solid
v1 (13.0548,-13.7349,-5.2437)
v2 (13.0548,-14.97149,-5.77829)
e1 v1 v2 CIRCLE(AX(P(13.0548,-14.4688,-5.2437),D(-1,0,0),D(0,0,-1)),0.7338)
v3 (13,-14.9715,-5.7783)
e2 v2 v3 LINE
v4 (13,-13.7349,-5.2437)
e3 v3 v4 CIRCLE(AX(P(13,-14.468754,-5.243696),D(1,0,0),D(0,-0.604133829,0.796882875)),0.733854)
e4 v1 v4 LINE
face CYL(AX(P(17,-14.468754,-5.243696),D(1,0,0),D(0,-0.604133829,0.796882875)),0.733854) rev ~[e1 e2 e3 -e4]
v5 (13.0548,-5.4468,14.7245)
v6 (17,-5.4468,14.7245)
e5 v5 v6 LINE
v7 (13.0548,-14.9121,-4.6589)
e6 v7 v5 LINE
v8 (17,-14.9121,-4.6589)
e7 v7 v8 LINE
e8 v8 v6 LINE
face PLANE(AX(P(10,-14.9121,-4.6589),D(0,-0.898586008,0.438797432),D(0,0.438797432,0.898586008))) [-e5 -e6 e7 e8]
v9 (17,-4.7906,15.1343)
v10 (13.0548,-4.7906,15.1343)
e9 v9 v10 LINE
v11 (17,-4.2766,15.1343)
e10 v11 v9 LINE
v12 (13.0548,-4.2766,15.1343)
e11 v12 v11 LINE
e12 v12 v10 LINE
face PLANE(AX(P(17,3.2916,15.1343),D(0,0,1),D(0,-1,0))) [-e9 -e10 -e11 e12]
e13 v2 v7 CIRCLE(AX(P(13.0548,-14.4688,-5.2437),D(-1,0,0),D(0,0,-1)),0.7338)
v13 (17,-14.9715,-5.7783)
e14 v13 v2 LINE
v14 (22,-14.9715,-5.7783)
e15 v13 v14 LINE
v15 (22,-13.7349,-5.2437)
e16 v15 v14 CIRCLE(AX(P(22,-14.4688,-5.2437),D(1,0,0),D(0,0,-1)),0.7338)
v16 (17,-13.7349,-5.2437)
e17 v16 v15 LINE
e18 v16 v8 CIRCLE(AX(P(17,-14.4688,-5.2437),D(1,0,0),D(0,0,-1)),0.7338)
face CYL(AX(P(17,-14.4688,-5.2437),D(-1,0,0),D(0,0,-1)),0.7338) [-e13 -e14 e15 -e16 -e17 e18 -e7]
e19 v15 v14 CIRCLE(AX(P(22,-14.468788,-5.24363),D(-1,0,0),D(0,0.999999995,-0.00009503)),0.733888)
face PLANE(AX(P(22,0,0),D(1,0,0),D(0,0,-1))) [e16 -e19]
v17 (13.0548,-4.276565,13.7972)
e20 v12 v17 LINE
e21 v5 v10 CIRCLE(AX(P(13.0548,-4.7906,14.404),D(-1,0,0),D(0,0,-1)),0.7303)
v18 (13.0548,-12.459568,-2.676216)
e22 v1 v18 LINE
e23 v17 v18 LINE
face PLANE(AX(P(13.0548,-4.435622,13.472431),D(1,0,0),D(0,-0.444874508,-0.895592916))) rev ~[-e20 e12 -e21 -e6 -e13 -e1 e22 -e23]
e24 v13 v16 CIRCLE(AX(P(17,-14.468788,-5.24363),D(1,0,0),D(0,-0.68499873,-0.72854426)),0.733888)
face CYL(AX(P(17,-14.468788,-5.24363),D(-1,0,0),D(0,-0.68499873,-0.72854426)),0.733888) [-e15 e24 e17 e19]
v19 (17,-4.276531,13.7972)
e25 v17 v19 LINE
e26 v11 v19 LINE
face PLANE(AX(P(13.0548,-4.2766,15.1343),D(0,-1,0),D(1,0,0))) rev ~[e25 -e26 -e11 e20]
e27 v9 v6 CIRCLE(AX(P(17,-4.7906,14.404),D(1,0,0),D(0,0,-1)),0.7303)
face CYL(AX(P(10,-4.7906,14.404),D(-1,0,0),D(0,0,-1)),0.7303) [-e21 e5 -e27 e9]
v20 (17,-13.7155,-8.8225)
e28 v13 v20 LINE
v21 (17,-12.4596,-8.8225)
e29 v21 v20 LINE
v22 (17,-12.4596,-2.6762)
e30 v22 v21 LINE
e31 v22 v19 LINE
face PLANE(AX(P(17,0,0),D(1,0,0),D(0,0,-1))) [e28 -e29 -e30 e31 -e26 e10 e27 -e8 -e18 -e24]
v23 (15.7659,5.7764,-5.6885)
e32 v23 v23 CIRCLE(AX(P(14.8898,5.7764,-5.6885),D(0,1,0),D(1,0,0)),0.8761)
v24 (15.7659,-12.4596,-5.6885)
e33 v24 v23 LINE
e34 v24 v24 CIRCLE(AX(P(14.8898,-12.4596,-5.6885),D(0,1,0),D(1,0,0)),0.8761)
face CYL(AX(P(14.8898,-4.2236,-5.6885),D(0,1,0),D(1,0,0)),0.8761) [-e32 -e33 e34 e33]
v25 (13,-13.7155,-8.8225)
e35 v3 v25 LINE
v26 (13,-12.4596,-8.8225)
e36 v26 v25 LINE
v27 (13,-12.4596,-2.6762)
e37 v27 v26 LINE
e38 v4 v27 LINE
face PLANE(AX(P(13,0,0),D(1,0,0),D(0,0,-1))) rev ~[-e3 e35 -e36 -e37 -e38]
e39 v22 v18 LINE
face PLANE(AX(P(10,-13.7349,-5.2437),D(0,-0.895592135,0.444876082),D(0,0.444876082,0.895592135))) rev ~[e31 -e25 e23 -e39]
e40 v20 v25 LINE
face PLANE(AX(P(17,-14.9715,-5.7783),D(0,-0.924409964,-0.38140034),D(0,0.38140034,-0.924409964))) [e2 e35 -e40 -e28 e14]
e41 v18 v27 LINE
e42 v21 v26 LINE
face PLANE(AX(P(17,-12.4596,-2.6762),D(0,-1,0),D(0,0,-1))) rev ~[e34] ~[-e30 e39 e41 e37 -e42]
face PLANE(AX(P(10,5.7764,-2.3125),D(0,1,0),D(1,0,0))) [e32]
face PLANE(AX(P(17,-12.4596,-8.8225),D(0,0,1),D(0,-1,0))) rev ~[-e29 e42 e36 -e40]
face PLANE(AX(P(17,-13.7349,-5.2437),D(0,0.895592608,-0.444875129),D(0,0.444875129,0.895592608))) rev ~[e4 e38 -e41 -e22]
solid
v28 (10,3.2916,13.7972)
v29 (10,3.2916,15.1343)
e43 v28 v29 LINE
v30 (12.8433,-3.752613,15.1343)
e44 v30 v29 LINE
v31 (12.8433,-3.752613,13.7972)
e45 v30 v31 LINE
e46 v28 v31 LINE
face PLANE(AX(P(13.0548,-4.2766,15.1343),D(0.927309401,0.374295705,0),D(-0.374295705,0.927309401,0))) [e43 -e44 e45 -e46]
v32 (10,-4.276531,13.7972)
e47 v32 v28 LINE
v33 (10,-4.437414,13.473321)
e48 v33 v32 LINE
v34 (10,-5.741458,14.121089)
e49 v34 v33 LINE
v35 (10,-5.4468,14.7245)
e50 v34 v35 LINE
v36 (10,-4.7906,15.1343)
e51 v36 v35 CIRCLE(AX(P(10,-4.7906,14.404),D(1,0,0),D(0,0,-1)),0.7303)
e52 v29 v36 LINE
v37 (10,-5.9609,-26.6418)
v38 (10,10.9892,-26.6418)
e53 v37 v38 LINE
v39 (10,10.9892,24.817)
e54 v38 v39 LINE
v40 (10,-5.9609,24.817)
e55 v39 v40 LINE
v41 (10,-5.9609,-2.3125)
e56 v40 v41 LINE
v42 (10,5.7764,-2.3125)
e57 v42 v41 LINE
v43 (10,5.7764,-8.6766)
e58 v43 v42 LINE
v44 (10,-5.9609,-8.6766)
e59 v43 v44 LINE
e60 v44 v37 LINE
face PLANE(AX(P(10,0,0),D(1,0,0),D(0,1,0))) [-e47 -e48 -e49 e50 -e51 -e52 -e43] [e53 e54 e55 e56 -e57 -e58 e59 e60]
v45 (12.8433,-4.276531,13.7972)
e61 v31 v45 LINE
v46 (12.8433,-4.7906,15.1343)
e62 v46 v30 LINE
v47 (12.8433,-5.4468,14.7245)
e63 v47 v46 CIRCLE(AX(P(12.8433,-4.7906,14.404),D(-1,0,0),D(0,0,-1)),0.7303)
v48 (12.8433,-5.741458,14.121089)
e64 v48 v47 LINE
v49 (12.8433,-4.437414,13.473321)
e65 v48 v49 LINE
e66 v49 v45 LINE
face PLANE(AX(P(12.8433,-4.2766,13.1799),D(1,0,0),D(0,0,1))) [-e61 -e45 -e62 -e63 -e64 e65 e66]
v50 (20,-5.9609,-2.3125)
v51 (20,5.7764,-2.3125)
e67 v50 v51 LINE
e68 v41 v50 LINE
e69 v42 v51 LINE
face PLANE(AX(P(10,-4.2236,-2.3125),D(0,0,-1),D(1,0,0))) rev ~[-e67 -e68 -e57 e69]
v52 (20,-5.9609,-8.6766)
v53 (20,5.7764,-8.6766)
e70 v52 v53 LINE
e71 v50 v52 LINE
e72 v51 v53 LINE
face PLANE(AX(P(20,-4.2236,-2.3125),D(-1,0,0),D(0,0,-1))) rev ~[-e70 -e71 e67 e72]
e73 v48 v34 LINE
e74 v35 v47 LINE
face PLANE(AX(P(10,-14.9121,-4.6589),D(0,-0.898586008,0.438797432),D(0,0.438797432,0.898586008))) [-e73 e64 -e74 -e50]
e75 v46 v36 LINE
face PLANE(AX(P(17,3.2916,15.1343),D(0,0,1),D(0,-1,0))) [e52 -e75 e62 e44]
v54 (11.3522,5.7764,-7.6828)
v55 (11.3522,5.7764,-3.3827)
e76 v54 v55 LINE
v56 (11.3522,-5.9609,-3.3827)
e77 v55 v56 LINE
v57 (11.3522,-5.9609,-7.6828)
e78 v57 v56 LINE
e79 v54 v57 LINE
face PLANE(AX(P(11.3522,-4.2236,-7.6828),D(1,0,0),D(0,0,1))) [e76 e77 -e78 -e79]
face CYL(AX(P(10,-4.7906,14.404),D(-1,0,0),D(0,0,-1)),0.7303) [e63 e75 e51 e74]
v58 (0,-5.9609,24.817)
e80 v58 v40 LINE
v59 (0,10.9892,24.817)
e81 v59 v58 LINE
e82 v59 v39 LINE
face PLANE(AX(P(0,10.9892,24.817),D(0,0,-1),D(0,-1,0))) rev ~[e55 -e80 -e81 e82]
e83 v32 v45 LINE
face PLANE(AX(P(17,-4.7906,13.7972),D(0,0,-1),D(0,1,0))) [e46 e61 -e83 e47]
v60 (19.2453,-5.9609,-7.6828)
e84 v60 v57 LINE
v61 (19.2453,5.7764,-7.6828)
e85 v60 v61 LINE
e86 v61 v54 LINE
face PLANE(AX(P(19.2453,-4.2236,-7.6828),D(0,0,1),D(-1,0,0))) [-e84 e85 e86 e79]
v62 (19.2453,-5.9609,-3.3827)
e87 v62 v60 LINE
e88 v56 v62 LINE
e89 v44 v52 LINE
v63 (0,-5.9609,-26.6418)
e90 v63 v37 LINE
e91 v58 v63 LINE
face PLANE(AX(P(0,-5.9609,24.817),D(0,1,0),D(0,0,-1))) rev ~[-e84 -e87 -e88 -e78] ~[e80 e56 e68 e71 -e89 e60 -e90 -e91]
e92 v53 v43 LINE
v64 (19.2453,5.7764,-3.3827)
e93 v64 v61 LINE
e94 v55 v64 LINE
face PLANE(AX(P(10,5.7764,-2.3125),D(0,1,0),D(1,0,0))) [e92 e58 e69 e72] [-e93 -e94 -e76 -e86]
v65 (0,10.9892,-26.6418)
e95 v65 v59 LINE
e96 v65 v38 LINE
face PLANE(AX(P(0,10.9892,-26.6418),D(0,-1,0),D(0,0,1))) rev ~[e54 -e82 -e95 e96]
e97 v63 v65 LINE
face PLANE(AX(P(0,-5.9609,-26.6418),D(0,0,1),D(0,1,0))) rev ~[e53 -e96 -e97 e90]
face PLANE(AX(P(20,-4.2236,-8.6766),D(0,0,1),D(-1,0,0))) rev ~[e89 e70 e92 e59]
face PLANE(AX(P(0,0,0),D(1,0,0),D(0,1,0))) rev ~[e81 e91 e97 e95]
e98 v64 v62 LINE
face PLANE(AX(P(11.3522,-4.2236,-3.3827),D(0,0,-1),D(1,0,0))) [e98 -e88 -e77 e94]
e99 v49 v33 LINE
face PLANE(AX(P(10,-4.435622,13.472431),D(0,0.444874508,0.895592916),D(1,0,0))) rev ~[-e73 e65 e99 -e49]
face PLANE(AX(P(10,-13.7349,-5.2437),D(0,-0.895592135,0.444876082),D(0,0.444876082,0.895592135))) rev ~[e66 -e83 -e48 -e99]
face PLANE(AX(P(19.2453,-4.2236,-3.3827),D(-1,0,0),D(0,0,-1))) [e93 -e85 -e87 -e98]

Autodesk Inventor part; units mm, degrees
ref_plane "YZ Plane" through (0, 0, 0) normal (1, 0, 0) x (0, 1, 0)
ref_plane "XZ Plane" through (0, 0, 0) normal (0, 1, 0) x (-1, 0, 0)
ref_plane "XY Plane" through (0, 0, 0) normal (0, 0, 1) x (1, 0, 0)
sketch "Эскиз1" plane through (0, 0, 0) normal (1, 0, 0) x (0, 1, 0)
  line L0 (10.9892, 24.817) -> (-5.9609, 24.817)
  line L1 (-5.9609, 24.817) -> (-5.9609, -26.6418)
  line L2 (-5.9609, -26.6418) -> (10.9892, -26.6418)
  line L3 (10.9892, -26.6418) -> (10.9892, 24.817)
  point P0 (0, 0)
extrude "Выдавливание1" add sketch "Эскиз1" along normal blind 10
sketch "Эскиз2" plane through (10, 0, 0) normal (1, 0, 0) x (0, 0, -1)
  line L0 (-24.817, -5.9609) -> (26.6418, -5.9609) projected
  line L1 (8.6766, -5.9609) -> (2.3125, -5.9609)
  line L2 (2.3125, -5.9609) -> (2.3125, -4.2236)
  line L3 (2.3125, -4.2236) -> (8.6766, -4.2236)
  line L4 (8.6766, -4.2236) -> (8.6766, -5.9609)
  point P0 (0, 0)
extrude "Выдавливание2" add sketch "Эскиз2" along normal blind 10
sketch "Эскиз3" plane through (10, -4.2236, -2.3125) normal (0, 1, 0) x (1, 0, 0)
  line L0 (9.2453, 5.3703) -> (1.3522, 5.3703)
  line L1 (1.3522, 5.3703) -> (1.3522, 1.0702)
  line L2 (1.3522, 1.0702) -> (9.2453, 1.0702)
  line L3 (9.2453, 1.0702) -> (9.2453, 5.3703)
  point P0 (-10, -2.3125)
extrude "Выдавливание3" cut sketch "Эскиз3" against normal blind 10
sketch "Эскиз4" plane through (10, 0, 0) normal (1, 0, 0) x (0, 0, -1)
  circle A0 centre (-14.404, -4.7906) radius 0.7303
  circle A1 centre (5.2437, -14.4688) radius 0.7338
  line L0 (5.2437, -13.7349) -> (-14.0791, -4.1365)
  line L1 (4.6589, -14.9121) -> (-14.7245, -5.4468)
  point P0 (0, 0)
extrude "Выдавливание4" add sketch "Эскиз4" along normal blind 7
sketch "Эскиз5" plane through (10, -4.1365, 14.0791) normal (0, 0.8955929, -0.4448745) x (1, 0, 0)
  line L0 (0, 29.7403) -> (0, -16.3458) projected
  line L1 (0, 0.6764) -> (3.0548, 0.6764)
  line L2 (3.0548, 0.6764) -> (3.0548, 24.6626)
  line L3 (3.0548, 24.6626) -> (0, 24.6626)
  line L4 (0, 24.6626) -> (0, 0.6764)
  point P0 (-10, 10.7689)
  point P1 (0, 24.6626)
extrude "Выдавливание5" cut sketch "Эскиз5" against normal mid plane 10
sketch "Эскиз6" plane through (10, -4.2236, -2.3125) normal (0, 1, 0) x (1, 0, 0)
  circle A0 centre (4.8898, 3.376) radius 0.8761
  point P0 (-10, -2.3125)
extrude "Выдавливание6" add sketch "Эскиз6" along normal mid plane 20
sketch "Эскиз7" plane through (17, 0, 0) normal (1, 0, 0) x (0, 0, -1)
  point P0 (0, 0)
sketch "Эскиз8" plane through (10, -4.2236, -2.3125) normal (0, 1, 0) x (1, 0, 0)
  line L0 (10, 0) -> (10, 6.3641) projected
  line L1 (10, 6.3641) -> (0, 6.3641)
  line L2 (0, 6.3641) -> (0, 0)
  line L3 (0, 0) -> (10, 0)
  line L4 (10, 0) -> (10, 6.3641)
  line L5 (9.2453, 5.3703) -> (1.3522, 5.3703) projected
  line L6 (1.3522, 5.3703) -> (1.3522, 1.0702) projected
  line L7 (9.2453, 5.3703) -> (1.3522, 5.3703)
  line L8 (1.3522, 5.3703) -> (1.3522, 1.0702)
  line L9 (1.3522, 1.0702) -> (9.2453, 1.0702)
  line L10 (9.2453, 1.0702) -> (9.2453, 5.3703)
  point P0 (-10, -2.3125)
extrude "Выдавливание7" add sketch "Эскиз8" along normal blind 10
sketch "Эскиз11" plane through (17, 0, 0) normal (1, 0, 0) x (0, 0, -1)
  arc A0 (-14.0791, -4.1365) -> (-14.7245, -5.4468) centre (-14.404, -4.7906) ccw projected
  line L0 (-15.1343, -4.7906) -> (-13.7972, -4.7906)
  line L1 (-13.7972, -4.7906) -> (-13.7972, 3.2916)
  line L2 (-13.7972, 3.2916) -> (-15.1343, 3.2916)
  line L3 (-15.1343, 3.2916) -> (-15.1343, -4.7906)
  point P0 (0, 0)
extrude "Выдавливание8" add sketch "Эскиз11" against normal blind 10
sketch "Эскиз12" plane through (17, -4.7906, 15.1343) normal (0, 0, 1) x (1, 0, 0)
  line L0 (-7, 0.514) -> (0, 0.514) projected
  line L1 (0, 0.514) -> (-3.9452, 0.514)
  line L2 (-7, 8.0822) -> (-7, 0.514) projected
  line L3 (-3.9452, 0.514) -> (-7, 8.0822)
  line L4 (-7, 8.0822) -> (0, 8.0822)
  line L5 (-3.9452, 0.3531) -> (-7, 0.3531) projected
  line L6 (0, 0.514) -> (0, 8.0822) projected
  line L7 (0, 8.0822) -> (0, 0.514)
  line L8 (0, 0.514) -> (-3.9452, 0.514)
  point P0 (-17, 4.7906)
extrude "Выдавливание9" cut sketch "Эскиз12" against normal blind 10 contours L3 L4 L6 L0
sketch "Эскиз13" plane through (17, 0, 0) normal (1, 0, 0) x (0, 0, -1)
  line L0 (5.2437, -13.7349) -> (-13.4734, -4.4374) projected
  line L1 (2.6762, -12.4596) -> (8.8225, -12.4596)
  line L2 (8.8225, -12.4596) -> (8.8225, -14.9715)
  line L3 (8.8225, -14.9715) -> (2.6762, -14.9715)
  line L4 (2.6762, -14.9715) -> (2.6762, -12.4596)
  line L5 (-14.1211, -5.7414) -> (4.6589, -14.9121) projected
  line L6 (4.6589, -14.9121) -> (2.6762, -13.9439)
  arc A0 (4.6589, -14.9121) -> (5.2437, -13.7349) centre (5.2437, -14.4688) ccw projected
  line L7 (5.7783, -14.9715) -> (8.8225, -13.7155)
  point P0 (0, 0)
extrude "Выдавливание10" add sketch "Эскиз13" against normal blind 4 contours L0 L1 L2 L7 A0
sketch "Эскиз14" plane through (13.0548, -4.2766, 15.1343) normal (0, 1, 0) x (1, 0, 0)
  line L0 (0, 1.0132) -> (0, 19.7932) projected
  line L1 (0, 1.9544) -> (-0.2115, 1.9544)
  line L2 (-0.2115, 1.9544) -> (-0.2115, -0.5785)
  line L3 (-0.2115, -0.5785) -> (0, -0.5785)
  line L4 (0, -0.5785) -> (0, 1.9544)
  point P0 (-13.0548, 15.1343)
extrude "Выдавливание11" cut sketch "Эскиз14" along normal mid plane 10
sketch "Эскиз15" plane through (17, 0, 0) normal (1, 0, 0) x (0, 0, -1)
  arc A0 (5.7783, -14.9715) -> (5.2437, -13.7349) centre (5.2437, -14.4688) ccw projected
  circle A1 centre (5.2437, -14.4688) radius 0.7338
  point P0 (0, 0)
  point P1 (5.2437, -13.7349)
extrude "Выдавливание12" add sketch "Эскиз15" along normal blind 5
properties part number "пример подвески 1"
